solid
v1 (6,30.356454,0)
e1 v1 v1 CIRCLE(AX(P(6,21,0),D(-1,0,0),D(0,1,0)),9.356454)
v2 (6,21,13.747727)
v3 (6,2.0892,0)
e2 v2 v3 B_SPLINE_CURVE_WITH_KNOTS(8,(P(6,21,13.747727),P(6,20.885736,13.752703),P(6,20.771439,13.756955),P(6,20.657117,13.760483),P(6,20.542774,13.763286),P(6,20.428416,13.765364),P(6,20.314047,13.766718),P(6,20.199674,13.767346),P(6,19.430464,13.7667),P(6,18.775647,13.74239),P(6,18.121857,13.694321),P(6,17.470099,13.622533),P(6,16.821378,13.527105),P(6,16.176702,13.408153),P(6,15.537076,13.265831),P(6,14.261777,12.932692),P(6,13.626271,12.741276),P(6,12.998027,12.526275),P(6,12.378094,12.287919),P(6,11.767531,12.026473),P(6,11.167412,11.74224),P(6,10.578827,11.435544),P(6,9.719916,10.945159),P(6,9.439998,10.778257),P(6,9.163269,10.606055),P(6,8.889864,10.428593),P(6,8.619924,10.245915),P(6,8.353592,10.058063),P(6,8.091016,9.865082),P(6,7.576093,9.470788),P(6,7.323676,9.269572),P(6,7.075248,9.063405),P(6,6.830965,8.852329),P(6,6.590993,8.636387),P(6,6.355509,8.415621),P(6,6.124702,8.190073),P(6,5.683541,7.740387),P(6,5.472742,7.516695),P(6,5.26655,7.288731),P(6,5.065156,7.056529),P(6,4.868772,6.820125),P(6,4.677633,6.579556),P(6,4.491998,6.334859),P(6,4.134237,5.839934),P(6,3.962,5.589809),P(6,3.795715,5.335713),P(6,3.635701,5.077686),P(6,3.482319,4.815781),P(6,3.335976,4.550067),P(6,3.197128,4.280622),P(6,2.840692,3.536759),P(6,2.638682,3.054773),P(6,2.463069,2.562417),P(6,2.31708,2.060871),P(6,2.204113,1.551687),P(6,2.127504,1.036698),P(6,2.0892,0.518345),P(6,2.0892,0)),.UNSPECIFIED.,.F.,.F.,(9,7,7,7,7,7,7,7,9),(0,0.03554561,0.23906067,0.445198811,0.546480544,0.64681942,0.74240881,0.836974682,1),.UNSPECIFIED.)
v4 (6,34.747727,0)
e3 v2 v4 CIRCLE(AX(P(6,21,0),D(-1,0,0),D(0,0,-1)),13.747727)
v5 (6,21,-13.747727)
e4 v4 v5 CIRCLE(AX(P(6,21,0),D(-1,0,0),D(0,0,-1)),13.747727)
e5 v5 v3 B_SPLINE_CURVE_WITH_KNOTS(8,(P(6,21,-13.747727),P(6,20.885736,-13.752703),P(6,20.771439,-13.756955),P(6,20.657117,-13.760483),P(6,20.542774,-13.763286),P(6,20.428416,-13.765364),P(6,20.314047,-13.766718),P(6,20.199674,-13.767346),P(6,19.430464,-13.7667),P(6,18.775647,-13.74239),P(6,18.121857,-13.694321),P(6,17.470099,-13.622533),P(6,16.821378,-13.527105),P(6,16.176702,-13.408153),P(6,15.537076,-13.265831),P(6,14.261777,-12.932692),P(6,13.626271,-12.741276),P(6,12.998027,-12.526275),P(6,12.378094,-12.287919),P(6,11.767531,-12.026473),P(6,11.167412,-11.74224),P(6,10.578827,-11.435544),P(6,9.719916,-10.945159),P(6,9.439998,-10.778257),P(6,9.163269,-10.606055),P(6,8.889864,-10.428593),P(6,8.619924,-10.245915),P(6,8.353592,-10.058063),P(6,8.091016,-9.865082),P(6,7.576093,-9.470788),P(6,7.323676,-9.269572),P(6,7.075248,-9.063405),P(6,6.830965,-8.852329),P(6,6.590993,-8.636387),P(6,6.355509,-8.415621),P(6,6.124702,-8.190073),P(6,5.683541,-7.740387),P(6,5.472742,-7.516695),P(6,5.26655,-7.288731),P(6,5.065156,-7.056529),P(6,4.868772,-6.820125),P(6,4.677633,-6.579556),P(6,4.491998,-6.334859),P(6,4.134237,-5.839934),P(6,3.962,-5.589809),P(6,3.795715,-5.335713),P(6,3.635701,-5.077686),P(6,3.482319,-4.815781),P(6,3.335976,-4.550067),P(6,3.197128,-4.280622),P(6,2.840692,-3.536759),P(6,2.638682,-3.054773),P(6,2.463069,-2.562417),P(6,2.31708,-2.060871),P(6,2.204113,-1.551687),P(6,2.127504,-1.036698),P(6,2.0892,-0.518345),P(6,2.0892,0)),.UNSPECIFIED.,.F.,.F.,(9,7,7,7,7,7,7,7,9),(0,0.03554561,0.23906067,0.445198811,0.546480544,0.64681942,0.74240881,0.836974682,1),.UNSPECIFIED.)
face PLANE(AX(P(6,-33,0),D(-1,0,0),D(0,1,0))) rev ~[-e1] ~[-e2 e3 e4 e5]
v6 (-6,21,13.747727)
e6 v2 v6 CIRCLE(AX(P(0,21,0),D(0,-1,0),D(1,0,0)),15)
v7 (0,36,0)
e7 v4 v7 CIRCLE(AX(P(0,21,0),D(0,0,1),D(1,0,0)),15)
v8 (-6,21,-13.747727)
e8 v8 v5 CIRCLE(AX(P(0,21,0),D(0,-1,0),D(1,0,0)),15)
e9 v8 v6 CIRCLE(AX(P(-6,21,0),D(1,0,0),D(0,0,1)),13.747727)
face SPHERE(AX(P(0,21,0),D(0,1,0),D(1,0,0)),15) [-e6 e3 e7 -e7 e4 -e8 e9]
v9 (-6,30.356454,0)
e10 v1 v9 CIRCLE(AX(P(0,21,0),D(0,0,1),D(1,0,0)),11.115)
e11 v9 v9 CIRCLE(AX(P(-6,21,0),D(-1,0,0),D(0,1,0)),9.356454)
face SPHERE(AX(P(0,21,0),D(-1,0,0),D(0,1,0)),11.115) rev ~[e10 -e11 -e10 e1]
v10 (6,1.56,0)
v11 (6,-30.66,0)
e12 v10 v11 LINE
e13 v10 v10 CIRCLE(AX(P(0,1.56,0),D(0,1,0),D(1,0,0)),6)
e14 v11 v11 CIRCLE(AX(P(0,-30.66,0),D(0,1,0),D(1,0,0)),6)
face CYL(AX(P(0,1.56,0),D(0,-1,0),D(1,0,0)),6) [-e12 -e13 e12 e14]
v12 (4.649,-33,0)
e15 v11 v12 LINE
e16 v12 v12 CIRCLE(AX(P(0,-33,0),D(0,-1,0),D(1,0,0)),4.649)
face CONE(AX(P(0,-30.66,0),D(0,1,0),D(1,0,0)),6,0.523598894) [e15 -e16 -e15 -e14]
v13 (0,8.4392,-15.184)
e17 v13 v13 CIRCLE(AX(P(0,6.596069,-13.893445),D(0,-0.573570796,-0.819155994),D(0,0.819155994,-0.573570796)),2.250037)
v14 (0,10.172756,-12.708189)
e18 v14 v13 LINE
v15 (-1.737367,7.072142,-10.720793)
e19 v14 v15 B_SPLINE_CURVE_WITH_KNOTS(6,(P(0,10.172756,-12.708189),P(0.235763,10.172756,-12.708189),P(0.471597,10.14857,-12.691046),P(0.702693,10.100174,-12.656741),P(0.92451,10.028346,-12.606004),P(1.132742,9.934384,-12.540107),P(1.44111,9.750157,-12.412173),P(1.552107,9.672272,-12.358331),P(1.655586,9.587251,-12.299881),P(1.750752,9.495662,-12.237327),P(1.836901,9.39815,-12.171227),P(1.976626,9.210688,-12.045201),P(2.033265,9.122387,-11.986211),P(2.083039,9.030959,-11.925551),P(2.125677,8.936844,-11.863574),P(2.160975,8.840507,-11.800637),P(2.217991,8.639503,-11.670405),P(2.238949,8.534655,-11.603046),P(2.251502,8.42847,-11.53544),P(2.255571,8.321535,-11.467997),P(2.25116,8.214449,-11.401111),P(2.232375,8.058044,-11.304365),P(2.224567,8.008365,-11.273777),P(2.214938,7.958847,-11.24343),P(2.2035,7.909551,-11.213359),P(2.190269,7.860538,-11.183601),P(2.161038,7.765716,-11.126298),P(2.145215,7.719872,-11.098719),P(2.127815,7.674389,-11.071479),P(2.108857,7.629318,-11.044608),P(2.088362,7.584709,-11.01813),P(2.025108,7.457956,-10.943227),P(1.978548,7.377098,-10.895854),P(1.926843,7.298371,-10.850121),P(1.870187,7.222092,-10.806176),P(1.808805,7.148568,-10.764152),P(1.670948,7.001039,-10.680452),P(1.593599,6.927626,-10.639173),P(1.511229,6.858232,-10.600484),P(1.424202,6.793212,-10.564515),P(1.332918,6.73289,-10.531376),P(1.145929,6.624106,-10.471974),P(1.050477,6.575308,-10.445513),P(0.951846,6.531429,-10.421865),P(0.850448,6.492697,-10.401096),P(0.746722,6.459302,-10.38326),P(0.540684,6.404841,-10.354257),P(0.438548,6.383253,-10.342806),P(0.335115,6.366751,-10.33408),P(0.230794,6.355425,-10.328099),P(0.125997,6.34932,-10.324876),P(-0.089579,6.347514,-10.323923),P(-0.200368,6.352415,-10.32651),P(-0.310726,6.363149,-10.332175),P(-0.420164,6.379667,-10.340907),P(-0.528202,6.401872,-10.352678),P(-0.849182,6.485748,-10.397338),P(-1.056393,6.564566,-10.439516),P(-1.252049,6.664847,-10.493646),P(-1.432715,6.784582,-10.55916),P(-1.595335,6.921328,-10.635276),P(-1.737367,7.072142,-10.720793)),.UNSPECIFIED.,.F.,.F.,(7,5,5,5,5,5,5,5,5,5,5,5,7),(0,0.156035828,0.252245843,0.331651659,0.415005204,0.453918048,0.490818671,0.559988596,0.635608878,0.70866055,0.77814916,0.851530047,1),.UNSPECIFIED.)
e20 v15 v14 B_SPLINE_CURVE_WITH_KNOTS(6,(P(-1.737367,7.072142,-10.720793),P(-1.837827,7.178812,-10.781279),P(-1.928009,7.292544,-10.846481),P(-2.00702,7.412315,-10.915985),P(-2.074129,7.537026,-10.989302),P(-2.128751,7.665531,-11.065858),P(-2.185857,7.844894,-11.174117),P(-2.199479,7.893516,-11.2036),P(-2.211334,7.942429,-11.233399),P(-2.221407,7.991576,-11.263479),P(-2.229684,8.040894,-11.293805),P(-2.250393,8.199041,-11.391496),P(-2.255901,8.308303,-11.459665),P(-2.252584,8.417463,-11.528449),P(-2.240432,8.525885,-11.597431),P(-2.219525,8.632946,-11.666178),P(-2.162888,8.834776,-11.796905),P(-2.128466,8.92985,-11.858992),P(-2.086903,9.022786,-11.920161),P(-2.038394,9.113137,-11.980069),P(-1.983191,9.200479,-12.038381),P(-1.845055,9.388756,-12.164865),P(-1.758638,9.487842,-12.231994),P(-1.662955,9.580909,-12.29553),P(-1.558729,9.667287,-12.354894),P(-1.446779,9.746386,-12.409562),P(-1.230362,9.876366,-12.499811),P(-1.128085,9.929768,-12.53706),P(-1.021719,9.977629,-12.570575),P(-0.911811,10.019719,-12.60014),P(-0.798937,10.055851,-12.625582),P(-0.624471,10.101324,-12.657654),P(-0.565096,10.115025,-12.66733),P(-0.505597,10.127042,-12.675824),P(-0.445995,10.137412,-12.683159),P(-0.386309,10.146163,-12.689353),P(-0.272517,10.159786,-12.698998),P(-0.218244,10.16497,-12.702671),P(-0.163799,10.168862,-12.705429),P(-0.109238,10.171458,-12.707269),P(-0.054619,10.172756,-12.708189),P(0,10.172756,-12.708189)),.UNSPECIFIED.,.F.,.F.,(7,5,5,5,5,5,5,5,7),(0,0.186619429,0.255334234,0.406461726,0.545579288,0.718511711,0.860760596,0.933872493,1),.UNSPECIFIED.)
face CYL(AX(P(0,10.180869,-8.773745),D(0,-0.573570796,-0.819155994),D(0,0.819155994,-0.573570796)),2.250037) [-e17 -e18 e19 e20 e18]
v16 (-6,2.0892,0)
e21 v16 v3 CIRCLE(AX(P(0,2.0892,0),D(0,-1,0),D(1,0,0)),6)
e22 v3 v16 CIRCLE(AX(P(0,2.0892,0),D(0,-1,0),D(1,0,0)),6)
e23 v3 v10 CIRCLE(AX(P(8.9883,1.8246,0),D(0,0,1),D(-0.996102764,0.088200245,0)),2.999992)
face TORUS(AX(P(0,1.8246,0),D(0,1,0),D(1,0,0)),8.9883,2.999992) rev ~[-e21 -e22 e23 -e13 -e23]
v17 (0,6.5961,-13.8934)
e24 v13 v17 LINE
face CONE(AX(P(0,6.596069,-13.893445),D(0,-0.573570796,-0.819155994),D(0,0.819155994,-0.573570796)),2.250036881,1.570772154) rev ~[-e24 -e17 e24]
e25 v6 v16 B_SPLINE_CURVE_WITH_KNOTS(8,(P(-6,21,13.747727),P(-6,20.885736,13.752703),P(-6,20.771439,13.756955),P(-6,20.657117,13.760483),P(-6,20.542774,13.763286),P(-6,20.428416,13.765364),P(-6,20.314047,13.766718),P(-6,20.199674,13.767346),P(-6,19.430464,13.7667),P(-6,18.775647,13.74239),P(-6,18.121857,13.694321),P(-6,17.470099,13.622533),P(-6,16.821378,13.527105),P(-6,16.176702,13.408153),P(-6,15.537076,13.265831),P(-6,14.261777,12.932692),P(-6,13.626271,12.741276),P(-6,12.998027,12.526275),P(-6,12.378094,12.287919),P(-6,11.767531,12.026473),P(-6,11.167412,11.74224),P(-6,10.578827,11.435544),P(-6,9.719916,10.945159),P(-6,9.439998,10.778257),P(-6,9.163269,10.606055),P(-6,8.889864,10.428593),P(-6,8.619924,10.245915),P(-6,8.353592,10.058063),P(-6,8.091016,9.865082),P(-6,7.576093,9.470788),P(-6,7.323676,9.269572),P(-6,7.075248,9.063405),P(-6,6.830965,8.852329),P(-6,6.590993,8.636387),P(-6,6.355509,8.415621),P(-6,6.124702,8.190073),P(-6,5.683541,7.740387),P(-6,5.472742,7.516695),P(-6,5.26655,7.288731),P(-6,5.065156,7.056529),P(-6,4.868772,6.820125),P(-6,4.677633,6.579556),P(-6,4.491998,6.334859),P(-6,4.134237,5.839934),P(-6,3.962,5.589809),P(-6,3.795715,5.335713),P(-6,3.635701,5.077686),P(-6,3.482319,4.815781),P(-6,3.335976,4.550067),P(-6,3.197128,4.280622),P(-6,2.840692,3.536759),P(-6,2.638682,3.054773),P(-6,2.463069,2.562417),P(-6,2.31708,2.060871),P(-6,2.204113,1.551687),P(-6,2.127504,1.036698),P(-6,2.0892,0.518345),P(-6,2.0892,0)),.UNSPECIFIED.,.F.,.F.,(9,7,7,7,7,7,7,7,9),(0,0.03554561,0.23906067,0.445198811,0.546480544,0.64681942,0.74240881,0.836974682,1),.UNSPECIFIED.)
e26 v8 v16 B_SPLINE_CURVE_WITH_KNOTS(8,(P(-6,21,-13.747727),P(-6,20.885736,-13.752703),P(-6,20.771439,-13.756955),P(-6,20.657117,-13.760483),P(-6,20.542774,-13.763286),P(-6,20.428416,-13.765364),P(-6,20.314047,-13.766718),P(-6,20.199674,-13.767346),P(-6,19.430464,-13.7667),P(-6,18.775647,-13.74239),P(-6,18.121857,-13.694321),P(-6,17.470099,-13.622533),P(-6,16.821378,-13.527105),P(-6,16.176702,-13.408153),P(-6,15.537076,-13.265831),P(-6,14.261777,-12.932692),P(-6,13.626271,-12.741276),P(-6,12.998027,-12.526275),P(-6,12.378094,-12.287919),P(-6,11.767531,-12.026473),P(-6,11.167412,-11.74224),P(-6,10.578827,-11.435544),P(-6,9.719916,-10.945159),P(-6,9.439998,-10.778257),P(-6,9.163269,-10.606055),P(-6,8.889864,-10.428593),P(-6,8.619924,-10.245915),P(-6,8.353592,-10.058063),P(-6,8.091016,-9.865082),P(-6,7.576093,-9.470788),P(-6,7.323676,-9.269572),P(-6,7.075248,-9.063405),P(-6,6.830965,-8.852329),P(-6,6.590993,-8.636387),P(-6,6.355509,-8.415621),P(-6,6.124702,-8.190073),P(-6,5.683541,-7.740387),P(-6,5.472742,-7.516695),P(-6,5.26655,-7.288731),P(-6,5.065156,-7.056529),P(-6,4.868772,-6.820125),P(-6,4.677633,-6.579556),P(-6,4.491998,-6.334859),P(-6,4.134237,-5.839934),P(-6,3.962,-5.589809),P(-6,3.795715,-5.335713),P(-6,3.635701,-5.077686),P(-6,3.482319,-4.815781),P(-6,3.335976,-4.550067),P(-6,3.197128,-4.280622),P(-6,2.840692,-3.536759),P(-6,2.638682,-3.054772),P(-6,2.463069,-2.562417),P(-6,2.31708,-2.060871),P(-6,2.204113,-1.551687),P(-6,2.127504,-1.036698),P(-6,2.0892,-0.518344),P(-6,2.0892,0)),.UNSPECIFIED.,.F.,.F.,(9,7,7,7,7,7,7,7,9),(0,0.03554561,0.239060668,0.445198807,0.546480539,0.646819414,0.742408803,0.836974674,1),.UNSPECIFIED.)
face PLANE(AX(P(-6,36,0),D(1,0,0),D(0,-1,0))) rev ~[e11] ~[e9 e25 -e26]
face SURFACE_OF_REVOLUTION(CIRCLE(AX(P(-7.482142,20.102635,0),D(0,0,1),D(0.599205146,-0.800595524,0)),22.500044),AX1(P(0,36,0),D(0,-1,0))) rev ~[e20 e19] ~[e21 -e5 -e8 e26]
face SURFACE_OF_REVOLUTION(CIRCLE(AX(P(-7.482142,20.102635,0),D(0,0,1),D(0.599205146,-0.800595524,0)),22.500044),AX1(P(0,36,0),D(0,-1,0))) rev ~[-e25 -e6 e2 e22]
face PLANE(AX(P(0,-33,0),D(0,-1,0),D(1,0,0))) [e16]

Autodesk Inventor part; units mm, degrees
sketch "Sketch_5" plane through (0, 0, 0) normal (0, 0, 1) x (1, 0, 0)
  line L0 (0, -33) -> (0, 36)
  arc A0 (15, 21) -> (0, 36) centre (0, 21) ccw
  arc A1 (6, 2.0892) -> (15, 21) centre (-7.4821, 20.1026) ccw
  arc A2 (6, 2.0892) -> (6, 1.56) centre (8.9883, 1.8246) ccw
  line L1 (6, 1.56) -> (6, -30.66)
  line L2 (6, -30.66) -> (4.649, -33)
  line L3 (4.649, -33) -> (0, -33)
  line L4 (0, -33) -> (0, 36)
revolve "Revolution1" add sketch "Sketch_5" angle 360 about axis through (0, -33, 0) along (0, -1, 0)
thread "Thread1" size "M12x1.75" class "6g" standard "ISO Metric profile" length 30.66
sketch "Sketch_6" plane through (0, 0, 0) normal (0, 0, 1) x (1, 0, 0)
  line L0 (-22.5, 37.8) -> (-22.5, -34.65)
  line L1 (-22.5, -34.65) -> (22.5, -34.65)
  line L2 (22.5, -34.65) -> (22.5, 37.8)
  line L3 (22.5, 37.8) -> (-22.5, 37.8)
  line L4 (-6, 36) -> (-6, -33)
  line L5 (-6, -33) -> (6, -33)
  line L6 (6, -33) -> (6, 36)
  line L7 (6, 36) -> (-6, 36)
extrude "Extrusion1" cut sketch "Sketch_6" along normal mid plane 30
sketch "Sketch_7" plane through (0, 0, 0) normal (0, 0, 1) x (1, 0, 0)
  line L0 (11.115, 21) -> (-11.115, 21)
  arc A0 (11.115, 21) -> (-11.115, 21) centre (0, 21) ccw
  line L1 (11.115, 21) -> (-11.115, 21)
revolve "Revolution2" cut sketch "Sketch_7" angle 360 about axis through (11.115, 21, 0) along (1, 0, 0)
sketch "Sketch_14" plane through (0, 0, 0) normal (1, 0, 0) x (0, 1, 0)
  line L0 (6.5961, -13.8934) -> (10.1809, -8.7737)
  line L1 (10.1809, -8.7737) -> (12.024, -10.0643)
  line L2 (12.024, -10.0643) -> (8.4392, -15.184)
  line L3 (8.4392, -15.184) -> (6.5961, -13.8934)
  line L4 (6.5961, -13.8934) -> (10.1809, -8.7737)
revolve "Revolution3" add sketch "Sketch_14" angle 360 about axis through (0, 6.5961, -13.8934) along (0, -0.5735764, -0.819152)
ref_plane "IP1_XY" through (0, 21, 0) normal (1, 0, 0) x (0, 0, -1)
ref_plane "IP1_YZ" through (0, 21, 0) normal (0, 0, -1) x (0, 1, 0)
ref_plane "IP1_ZX" through (0, 21, 0) normal (0, 1, 0) x (1, 0, 0)
properties part number "POS 12 Body"
